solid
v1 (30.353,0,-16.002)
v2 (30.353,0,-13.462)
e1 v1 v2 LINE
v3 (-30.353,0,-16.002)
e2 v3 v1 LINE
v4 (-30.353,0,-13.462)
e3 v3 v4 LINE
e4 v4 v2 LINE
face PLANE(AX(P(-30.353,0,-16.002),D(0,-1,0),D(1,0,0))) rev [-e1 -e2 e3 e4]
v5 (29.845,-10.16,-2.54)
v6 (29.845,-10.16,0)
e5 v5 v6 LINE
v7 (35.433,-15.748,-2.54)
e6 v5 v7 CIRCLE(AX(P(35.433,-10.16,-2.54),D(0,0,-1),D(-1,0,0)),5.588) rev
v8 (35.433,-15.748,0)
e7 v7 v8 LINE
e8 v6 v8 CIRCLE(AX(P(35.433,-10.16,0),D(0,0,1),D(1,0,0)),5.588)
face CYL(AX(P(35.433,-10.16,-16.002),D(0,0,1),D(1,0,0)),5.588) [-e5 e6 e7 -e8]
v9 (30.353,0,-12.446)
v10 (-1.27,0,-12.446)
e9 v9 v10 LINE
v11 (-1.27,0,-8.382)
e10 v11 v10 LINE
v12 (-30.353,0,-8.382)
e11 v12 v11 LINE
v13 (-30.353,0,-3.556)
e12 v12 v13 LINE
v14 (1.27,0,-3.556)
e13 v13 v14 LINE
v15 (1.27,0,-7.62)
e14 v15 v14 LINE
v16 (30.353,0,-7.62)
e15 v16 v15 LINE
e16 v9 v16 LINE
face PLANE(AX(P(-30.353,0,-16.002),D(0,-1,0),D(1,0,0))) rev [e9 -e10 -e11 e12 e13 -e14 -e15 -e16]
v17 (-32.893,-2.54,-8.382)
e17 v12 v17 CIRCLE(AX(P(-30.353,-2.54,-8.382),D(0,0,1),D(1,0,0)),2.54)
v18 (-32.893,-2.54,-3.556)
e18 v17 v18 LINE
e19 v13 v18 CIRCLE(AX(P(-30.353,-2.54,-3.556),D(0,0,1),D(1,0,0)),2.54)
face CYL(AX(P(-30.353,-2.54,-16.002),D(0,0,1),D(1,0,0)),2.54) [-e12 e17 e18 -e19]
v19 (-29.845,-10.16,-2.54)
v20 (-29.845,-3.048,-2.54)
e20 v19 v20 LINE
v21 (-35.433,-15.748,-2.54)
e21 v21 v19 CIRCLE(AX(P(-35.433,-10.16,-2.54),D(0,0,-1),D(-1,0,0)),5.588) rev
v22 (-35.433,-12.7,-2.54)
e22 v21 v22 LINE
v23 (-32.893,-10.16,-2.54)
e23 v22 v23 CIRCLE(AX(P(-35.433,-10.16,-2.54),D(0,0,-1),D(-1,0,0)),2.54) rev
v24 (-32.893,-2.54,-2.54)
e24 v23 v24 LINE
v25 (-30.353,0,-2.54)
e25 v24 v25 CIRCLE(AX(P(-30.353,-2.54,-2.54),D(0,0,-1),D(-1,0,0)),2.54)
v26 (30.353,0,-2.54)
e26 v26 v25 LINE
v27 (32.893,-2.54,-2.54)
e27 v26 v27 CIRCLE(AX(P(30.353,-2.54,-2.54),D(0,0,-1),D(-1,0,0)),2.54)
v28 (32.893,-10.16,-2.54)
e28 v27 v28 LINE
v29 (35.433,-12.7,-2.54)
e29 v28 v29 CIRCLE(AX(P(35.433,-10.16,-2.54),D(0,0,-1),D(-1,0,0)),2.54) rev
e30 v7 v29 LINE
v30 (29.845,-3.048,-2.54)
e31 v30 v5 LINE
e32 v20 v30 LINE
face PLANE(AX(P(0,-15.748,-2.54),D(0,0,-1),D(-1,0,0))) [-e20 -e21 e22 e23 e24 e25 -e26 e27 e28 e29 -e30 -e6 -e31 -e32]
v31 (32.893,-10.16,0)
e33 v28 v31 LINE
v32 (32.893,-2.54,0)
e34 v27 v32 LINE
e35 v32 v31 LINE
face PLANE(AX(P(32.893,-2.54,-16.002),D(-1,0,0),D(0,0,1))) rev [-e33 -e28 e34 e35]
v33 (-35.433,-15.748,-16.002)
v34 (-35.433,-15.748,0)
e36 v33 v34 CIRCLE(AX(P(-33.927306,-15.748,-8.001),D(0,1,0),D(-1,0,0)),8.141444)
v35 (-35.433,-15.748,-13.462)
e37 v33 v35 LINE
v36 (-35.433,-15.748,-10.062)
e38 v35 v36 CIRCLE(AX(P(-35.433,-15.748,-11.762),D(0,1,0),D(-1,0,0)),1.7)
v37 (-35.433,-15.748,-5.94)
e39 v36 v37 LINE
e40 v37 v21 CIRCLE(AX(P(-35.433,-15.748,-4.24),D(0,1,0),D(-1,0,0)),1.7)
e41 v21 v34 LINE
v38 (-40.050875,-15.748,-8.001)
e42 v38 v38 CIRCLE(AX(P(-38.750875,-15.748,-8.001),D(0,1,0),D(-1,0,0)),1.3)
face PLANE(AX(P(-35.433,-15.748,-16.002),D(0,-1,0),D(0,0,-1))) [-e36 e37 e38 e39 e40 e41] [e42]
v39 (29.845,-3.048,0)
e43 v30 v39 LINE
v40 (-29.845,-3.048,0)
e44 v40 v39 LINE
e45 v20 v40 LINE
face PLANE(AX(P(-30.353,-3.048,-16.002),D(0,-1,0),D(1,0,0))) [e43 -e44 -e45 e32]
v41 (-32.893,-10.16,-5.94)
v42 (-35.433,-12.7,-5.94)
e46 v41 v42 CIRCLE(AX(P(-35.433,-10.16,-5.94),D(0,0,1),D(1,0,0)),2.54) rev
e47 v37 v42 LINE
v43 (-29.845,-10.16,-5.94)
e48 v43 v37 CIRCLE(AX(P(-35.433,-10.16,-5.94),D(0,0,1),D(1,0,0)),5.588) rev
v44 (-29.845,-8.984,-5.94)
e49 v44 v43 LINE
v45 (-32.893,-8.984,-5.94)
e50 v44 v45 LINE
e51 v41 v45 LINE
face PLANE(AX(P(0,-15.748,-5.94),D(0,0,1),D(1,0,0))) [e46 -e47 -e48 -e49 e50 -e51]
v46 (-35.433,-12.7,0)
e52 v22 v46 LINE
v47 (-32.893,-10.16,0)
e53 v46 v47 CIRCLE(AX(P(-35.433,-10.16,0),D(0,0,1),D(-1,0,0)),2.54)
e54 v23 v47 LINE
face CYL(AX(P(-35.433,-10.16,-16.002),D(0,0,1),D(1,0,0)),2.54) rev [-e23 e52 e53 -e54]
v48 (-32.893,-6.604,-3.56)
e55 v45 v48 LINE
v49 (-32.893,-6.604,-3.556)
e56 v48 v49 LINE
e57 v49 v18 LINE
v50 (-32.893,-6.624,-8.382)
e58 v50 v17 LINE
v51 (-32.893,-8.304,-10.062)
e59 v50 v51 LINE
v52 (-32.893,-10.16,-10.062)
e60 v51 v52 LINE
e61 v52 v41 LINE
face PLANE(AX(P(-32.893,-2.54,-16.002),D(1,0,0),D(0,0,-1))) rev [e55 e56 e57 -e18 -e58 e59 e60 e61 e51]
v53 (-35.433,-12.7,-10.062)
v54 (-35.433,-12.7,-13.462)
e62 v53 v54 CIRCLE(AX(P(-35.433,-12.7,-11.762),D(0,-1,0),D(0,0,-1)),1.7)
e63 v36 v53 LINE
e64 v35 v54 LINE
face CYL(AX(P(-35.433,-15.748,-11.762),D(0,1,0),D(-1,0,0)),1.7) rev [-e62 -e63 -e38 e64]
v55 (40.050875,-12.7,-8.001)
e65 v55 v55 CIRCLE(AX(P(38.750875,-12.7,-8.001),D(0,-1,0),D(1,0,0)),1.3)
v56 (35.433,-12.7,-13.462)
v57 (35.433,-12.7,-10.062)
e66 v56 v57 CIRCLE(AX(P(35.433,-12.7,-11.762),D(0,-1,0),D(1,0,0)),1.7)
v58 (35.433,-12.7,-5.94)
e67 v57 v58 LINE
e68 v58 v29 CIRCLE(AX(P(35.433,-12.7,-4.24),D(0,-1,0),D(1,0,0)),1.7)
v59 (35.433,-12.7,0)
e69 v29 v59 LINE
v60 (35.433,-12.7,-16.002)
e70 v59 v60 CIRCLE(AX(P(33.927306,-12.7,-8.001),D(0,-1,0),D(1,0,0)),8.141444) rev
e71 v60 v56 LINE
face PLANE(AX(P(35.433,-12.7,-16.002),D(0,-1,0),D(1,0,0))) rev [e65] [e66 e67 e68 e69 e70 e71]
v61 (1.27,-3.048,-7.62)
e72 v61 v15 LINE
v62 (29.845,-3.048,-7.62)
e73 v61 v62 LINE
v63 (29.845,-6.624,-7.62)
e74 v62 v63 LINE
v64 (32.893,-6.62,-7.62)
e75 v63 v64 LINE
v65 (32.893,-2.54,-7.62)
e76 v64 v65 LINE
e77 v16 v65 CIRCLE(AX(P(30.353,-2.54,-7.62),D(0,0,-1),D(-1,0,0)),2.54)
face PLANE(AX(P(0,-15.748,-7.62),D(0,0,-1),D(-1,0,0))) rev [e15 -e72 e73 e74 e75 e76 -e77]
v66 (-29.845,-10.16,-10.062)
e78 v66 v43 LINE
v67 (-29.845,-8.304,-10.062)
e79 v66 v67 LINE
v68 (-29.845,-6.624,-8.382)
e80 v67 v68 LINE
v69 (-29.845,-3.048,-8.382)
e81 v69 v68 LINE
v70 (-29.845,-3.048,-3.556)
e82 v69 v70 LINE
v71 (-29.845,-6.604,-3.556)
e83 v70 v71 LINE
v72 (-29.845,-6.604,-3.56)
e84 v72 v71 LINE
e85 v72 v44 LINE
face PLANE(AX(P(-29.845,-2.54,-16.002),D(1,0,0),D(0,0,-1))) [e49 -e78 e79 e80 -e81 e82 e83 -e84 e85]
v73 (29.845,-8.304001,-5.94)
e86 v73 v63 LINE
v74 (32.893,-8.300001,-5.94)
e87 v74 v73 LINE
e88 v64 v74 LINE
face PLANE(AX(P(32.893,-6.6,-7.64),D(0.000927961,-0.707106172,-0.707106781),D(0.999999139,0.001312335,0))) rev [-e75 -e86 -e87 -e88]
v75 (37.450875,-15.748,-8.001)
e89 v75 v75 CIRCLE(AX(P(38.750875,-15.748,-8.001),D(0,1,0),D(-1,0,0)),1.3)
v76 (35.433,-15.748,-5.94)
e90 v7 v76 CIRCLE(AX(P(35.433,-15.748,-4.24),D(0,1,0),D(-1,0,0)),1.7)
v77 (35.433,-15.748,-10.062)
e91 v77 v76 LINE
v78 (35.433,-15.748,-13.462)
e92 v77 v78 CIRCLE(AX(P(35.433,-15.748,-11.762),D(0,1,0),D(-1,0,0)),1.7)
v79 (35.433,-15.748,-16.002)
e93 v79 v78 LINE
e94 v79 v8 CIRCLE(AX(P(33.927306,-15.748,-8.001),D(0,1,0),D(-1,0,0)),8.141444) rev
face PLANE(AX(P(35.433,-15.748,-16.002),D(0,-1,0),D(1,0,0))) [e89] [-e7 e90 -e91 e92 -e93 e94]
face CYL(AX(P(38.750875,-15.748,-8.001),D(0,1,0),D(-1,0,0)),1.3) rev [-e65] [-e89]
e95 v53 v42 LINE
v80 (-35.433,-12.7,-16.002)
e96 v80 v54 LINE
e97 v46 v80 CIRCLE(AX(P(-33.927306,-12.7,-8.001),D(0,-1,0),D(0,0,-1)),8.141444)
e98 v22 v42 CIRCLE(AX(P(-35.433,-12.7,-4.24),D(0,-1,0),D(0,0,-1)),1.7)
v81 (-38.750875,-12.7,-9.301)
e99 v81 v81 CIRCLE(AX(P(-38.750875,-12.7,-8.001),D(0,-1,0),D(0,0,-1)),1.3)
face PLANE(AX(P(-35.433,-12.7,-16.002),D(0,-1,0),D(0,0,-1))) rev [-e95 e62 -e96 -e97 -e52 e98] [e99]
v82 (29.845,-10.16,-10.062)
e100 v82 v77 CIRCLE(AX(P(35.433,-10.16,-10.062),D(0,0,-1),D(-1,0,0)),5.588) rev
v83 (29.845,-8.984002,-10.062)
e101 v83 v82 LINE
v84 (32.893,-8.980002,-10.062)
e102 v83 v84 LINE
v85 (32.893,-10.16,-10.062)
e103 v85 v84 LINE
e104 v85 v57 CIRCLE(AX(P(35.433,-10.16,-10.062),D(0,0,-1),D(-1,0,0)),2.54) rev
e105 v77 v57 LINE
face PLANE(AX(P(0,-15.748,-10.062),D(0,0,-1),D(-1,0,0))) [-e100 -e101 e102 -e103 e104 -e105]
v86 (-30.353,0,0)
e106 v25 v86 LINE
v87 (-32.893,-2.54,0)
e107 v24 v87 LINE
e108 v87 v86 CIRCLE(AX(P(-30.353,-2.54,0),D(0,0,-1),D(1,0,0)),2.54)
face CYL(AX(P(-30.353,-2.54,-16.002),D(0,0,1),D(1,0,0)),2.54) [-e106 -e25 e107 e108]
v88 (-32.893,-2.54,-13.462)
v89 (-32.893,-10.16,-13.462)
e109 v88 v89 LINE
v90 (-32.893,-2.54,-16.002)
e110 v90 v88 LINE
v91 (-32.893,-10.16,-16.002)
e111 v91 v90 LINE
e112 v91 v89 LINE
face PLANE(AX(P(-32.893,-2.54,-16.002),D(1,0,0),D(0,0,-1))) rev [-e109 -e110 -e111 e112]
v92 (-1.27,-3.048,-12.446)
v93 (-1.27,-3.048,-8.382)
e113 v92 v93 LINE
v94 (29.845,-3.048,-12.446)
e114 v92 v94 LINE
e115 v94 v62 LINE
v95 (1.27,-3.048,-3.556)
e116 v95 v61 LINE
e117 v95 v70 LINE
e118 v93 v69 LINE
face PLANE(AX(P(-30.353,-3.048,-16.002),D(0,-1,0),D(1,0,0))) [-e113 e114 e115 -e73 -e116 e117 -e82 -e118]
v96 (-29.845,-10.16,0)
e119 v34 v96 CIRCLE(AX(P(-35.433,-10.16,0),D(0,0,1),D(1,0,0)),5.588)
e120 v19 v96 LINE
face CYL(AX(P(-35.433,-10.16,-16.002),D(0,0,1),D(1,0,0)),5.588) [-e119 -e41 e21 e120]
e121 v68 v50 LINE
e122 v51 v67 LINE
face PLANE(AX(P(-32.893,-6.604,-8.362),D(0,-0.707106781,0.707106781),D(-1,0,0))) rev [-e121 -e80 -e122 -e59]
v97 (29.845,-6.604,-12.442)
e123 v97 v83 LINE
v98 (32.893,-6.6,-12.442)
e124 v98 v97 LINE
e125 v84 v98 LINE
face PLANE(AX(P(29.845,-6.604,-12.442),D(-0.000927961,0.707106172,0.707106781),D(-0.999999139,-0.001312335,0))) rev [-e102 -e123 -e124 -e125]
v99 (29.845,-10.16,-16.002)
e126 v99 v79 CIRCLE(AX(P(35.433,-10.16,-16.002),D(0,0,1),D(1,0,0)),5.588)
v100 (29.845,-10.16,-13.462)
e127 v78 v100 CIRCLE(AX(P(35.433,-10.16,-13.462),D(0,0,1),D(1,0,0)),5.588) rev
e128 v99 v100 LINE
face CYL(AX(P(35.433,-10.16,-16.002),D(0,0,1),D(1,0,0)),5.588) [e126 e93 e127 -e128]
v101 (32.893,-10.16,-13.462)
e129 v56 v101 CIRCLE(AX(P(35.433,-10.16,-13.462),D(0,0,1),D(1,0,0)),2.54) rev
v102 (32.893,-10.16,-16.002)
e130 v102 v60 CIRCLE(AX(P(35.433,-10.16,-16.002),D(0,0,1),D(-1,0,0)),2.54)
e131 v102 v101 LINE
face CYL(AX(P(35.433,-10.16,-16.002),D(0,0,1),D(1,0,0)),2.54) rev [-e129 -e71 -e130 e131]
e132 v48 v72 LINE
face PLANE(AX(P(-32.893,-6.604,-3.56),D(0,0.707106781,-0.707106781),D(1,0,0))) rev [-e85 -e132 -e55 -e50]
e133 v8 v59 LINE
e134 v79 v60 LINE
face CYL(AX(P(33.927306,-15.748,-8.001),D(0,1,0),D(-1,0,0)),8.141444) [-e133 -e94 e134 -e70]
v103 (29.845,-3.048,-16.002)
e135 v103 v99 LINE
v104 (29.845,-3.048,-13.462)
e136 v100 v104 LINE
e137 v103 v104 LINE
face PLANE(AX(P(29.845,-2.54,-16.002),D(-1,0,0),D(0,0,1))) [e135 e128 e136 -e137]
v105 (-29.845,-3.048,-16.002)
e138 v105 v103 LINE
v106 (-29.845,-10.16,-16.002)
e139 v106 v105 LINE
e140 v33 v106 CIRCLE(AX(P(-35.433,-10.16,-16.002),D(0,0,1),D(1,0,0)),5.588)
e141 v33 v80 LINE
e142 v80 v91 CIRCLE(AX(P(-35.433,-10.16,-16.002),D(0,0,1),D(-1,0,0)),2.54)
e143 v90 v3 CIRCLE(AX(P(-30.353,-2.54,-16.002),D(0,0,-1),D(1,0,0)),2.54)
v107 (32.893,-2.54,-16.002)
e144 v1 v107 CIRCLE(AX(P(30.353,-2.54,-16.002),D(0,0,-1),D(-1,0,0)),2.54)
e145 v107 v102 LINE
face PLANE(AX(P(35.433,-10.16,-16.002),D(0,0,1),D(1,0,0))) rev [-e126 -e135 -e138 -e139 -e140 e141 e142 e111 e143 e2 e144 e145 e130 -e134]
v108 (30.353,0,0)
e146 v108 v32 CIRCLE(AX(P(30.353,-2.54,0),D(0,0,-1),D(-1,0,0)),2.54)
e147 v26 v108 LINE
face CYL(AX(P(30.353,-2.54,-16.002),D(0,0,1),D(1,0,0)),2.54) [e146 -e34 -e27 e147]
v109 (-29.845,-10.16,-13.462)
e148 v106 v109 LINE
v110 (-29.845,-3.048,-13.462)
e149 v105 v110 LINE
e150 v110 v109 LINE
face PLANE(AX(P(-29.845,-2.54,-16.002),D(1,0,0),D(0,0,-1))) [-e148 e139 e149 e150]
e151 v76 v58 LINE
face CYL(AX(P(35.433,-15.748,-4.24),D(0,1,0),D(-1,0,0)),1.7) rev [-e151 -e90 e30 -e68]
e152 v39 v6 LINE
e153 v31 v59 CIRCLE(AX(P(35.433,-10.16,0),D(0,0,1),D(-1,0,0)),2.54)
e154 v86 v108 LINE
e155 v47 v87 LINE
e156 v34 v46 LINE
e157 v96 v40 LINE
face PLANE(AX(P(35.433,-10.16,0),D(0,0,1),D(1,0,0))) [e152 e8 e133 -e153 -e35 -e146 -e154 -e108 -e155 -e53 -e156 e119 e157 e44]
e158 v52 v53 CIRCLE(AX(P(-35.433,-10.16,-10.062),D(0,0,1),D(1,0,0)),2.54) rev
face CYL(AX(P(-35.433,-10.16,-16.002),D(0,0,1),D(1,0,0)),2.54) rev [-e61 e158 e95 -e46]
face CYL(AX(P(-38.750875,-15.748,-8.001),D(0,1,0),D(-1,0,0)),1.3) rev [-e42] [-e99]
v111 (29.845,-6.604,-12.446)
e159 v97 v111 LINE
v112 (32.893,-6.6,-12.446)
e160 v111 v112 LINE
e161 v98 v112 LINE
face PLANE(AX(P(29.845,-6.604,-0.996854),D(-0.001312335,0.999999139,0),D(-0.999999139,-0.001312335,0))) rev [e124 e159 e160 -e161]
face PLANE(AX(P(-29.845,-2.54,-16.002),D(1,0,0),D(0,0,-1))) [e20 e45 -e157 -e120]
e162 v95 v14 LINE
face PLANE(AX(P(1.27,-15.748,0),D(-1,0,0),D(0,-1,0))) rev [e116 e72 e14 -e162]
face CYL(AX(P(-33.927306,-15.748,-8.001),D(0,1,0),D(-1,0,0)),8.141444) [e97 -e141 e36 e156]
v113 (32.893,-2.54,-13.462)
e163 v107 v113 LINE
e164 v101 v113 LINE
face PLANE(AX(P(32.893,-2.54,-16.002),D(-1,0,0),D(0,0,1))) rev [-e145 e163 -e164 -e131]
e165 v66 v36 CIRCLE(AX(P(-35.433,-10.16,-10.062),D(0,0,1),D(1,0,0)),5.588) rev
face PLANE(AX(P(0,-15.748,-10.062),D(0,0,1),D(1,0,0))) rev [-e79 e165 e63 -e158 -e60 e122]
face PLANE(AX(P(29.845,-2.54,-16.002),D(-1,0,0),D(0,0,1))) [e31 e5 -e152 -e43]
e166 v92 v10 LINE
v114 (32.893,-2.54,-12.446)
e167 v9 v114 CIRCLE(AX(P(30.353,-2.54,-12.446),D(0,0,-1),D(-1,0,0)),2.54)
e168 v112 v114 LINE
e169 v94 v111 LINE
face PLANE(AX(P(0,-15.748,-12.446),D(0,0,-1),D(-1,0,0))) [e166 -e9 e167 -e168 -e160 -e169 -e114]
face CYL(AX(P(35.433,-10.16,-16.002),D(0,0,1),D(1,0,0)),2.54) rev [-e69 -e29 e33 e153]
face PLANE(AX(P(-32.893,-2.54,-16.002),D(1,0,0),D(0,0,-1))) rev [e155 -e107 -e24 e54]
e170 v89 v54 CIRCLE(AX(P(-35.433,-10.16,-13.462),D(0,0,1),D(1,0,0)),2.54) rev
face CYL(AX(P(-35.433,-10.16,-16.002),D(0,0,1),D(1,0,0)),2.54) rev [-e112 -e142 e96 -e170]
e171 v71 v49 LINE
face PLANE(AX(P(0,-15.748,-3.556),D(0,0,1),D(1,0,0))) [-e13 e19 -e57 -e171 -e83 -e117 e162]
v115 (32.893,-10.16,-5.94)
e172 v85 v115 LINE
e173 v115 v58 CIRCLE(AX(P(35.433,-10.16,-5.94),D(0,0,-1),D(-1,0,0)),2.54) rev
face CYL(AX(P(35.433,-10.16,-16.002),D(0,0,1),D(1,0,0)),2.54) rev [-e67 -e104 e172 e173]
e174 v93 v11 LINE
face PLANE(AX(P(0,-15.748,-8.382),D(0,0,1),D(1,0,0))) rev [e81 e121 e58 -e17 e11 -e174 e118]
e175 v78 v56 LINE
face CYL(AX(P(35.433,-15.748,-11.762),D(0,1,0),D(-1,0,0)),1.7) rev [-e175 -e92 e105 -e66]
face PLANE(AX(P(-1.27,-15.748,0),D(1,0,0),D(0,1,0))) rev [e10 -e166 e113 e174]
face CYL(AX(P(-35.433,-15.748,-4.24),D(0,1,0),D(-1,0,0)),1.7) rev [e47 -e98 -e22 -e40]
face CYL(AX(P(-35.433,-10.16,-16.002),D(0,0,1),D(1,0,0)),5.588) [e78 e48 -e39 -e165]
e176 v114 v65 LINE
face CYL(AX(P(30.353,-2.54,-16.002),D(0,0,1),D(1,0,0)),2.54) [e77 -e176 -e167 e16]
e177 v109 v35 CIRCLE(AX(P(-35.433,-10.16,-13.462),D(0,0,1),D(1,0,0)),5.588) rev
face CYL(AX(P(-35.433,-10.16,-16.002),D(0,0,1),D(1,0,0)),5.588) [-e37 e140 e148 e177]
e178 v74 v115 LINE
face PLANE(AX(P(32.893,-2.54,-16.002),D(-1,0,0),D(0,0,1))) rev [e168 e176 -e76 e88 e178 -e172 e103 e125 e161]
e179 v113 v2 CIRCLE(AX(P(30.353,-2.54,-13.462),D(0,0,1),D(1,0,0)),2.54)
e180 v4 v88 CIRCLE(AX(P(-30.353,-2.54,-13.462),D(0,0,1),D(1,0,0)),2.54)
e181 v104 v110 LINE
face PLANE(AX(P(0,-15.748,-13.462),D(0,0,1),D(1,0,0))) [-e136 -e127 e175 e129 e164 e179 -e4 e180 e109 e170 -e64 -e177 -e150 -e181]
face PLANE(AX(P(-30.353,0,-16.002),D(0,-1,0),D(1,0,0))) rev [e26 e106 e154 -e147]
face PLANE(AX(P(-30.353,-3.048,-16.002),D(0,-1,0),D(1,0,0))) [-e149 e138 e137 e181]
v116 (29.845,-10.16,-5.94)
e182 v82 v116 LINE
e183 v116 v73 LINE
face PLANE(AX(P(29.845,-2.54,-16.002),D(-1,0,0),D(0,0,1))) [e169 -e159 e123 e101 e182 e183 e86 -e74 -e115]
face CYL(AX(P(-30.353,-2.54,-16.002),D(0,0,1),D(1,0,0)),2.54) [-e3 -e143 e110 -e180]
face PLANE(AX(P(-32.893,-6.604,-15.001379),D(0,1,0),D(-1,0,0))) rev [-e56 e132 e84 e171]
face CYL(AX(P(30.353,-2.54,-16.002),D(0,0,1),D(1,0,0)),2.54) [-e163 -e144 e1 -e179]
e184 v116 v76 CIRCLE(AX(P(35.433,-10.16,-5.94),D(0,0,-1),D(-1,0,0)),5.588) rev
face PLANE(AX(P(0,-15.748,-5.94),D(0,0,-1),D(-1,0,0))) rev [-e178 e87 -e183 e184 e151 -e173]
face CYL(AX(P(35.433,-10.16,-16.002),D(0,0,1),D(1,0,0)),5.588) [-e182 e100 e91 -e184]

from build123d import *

# Parameters (mm, degrees)
EXTRUDE_THIN1_DEPTH    = 16.002
CUT_EXTRUDE1_START     = -15.748
CUT_EXTRUDE1_OUTLINE_R = 1.3
CUT_EXTRUDE1_DEPTH     = 15.748
BOSS_EXTRUDE2_DEPTH    = 1.68
BOSS_EXTRUDE3_START    = 1.68
BOSS_EXTRUDE3_DEPTH    = 1.68
CUT_EXTRUDE2_START     = -2.384
CUT_EXTRUDE2_DEPTH     = 2.384
CUT_EXTRUDE3_DEPTH     = 2.384
CHAMFER1_SIZE          = 1.7
CHAMFER2_SIZE          = 2.38


# Read off the part's stored shape, not the designer's step: Cut-Extrude1
with BuildPart() as part:
    # Sketch1 → Extrude-Thin1 (new body)
    with BuildSketch(Plane.XY):
        with BuildLine():
            Line((-42.06875, -12.7), (-35.433, -12.7))
            ThreePointArc((-35.433, -12.7), (-33.636948776, -11.956051224), (-32.893, -10.16))
            Line((-32.893, -10.16), (-32.893, -2.54))
            ThreePointArc((-32.893, -2.54), (-32.149051224, -0.743948776), (-30.353, 0))
            Line((-30.353, 0), (30.353, 0))
            ThreePointArc((30.353, 0), (32.149051224, -0.743948776), (32.893, -2.54))
            Line((32.893, -2.54), (32.893, -10.16))
            ThreePointArc((32.893, -10.16), (33.636948776, -11.956051224), (35.433, -12.7))
            Line((35.433, -12.7), (42.06875, -12.7))
            Line((42.06875, -12.7), (42.06875, -15.748))
            Line((42.06875, -15.748), (35.433, -15.748))
            ThreePointArc((35.433, -15.748), (31.481687307, -14.111312693), (29.845, -10.16))
            Line((29.845, -10.16), (29.845, -3.048))
            Line((29.845, -3.048), (-29.845, -3.048))
            Line((-29.845, -3.048), (-29.845, -10.16))
            ThreePointArc((-29.845, -10.16), (-31.481687307, -14.111312693), (-35.433, -15.748))
            Line((-35.433, -15.748), (-42.06875, -15.748))
            Line((-42.06875, -15.748), (-42.06875, -12.7))
        make_face()
    extrude(amount=-EXTRUDE_THIN1_DEPTH)

    # Cut-Extrude1 outline → Cut-Extrude1 (cut)
    with BuildSketch(Plane(origin=(0, 0, 0), x_dir=(1, 0, 0), z_dir=(0, 1, 0)).offset(CUT_EXTRUDE1_START)):
        with BuildLine():
            Line((35.433, 13.462), (-35.433, 13.462))
            ThreePointArc((-35.433, 13.462), (-37.133, 11.762), (-35.433, 10.062))
            Line((-35.433, 10.062), (-32.893, 10.062))
            Line((-32.893, 10.062), (-32.893, 8.382))
            Line((-32.893, 8.382), (-1.27, 8.382))
            Line((-1.27, 8.382), (-1.27, 12.446))
            Line((-1.27, 12.446), (32.893, 12.446))
            Line((32.893, 12.446), (32.893, 10.062))
            Line((32.893, 10.062), (35.433, 10.062))
            ThreePointArc((35.433, 10.062), (37.133, 11.762), (35.433, 13.462))
        make_face()
        with BuildLine():
            Line((32.893, 5.94), (32.893, 7.62))
            Line((32.893, 7.62), (1.27, 7.62))
            Line((1.27, 7.62), (1.27, 3.556))
            Line((1.27, 3.556), (-32.893, 3.556))
            Line((-32.893, 3.556), (-32.893, 5.94))
            Line((-32.893, 5.94), (-35.433, 5.94))
            ThreePointArc((-35.433, 5.94), (-37.133, 4.24), (-35.433, 2.54))
            Line((-35.433, 2.54), (35.433, 2.54))
            ThreePointArc((35.433, 2.54), (37.133, 4.24), (35.433, 5.94))
            Line((35.433, 5.94), (32.893, 5.94))
        make_face()
        with BuildLine():
            Line((42.06875, 16.002), (35.433, 16.002))
            ThreePointArc((35.433, 16.002), (40.193949205, 13.198335352), (42.06875, 8.001))
            Line((42.06875, 8.001), (42.06875, 16.002))
        make_face()
        with BuildLine():
            Line((42.06875, 0), (42.06875, 8.001))
            ThreePointArc((42.06875, 8.001), (40.193949205, 2.803664648), (35.433, 0))
            Line((35.433, 0), (42.06875, 0))
        make_face()
        with BuildLine():
            ThreePointArc((-42.06875, 8.001), (-40.193949205, 13.198335352), (-35.433, 16.002))
            Line((-35.433, 16.002), (-42.06875, 16.002))
            Line((-42.06875, 16.002), (-42.06875, 8.001))
        make_face()
        with BuildLine():
            ThreePointArc((-35.433, 0), (-40.193949205, 2.803664648), (-42.06875, 8.001))
            Line((-42.06875, 8.001), (-42.06875, 0))
            Line((-42.06875, 0), (-35.433, 0))
        make_face()
        with Locations((38.750875, 8.001)):
            Circle(CUT_EXTRUDE1_OUTLINE_R)
        with Locations((-38.750875, 8.001)):
            Circle(CUT_EXTRUDE1_OUTLINE_R)
    extrude(amount=CUT_EXTRUDE1_DEPTH, mode=Mode.SUBTRACT)

    # Sketch6 → Boss-Extrude2 (add)
    with BuildSketch(Plane(origin=(0, 0, -8.382), x_dir=(-1, 0, 0), z_dir=(0, 0, -1))):
        with BuildLine():
            Line((32.893, -10.16), (32.893, -6.604))
            Line((32.893, -6.604), (29.845, -6.604))
            Line((29.845, -6.604), (29.845, -10.16))
            ThreePointArc((29.845, -10.16), (30.667537588, -13.078237824), (32.893, -15.137363157))
            Line((32.893, -15.137363157), (32.893, -10.16))
        make_face()
    extrude(amount=BOSS_EXTRUDE2_DEPTH)

    # Sketch7 → Boss-Extrude3 (add)
    with BuildSketch(Plane.XY.offset(-7.62).offset(BOSS_EXTRUDE3_START)):
        with BuildLine():
            Line((32.893, -10.16), (32.893, -6.6))
            Line((32.893, -6.6), (29.845, -6.604))
            Line((29.845, -6.604), (29.845, -10.16))
            ThreePointArc((29.845, -10.16), (30.667537588, -13.078237824), (32.893, -15.137363157))
            Line((32.893, -15.137363157), (32.893, -10.16))
        make_face()
    extrude(amount=-BOSS_EXTRUDE3_DEPTH)

    # Sketch8 → Cut-Extrude2 (cut)
    with BuildSketch(Plane(origin=(0, 0, -12.446), x_dir=(-1, 0, 0), z_dir=(0, 0, -1)).offset(CUT_EXTRUDE2_START)):
        with BuildLine():
            Line((-32.893, -15.137363157), (-32.893, -6.6))
            Line((-32.893, -6.6), (-29.845, -6.604))
            Line((-29.845, -6.604), (-29.845, -10.16))
            ThreePointArc((-29.845, -10.16), (-30.667537588, -13.078237824), (-32.893, -15.137363157))
        make_face()
    extrude(amount=CUT_EXTRUDE2_DEPTH, mode=Mode.SUBTRACT)

    # Sketch9 → Cut-Extrude3 (cut)
    with BuildSketch(Plane.XY.offset(-3.556)):
        with BuildLine():
            Line((-32.893, -15.137363157), (-32.893, -6.604))
            Line((-32.893, -6.604), (-29.845, -6.604))
            Line((-29.845, -6.604), (-29.845, -10.16))
            ThreePointArc((-29.845, -10.16), (-30.667537588, -13.078237824), (-32.893, -15.137363157))
        make_face()
    extrude(amount=-CUT_EXTRUDE3_DEPTH, mode=Mode.SUBTRACT)

    # Chamfer1
    # the kernel refuses this chamfer: 1.7 mm, written as the material it adds along each edge
    # the kernel refuses this chamfer: 1.7 mm, written as the material it takes off along each edge
    with BuildSketch(Plane(origin=(-37.26486108, -6.604, -10.062), x_dir=(0, -0.9996219169112968, -0.02749587661058687), z_dir=(1, 0, 0))) as chamfer1_2_piece_1_section:
        Polygon((CHAMFER1_SIZE * 0.999621916911, -CHAMFER1_SIZE * 0.0274958766106), (-CHAMFER1_SIZE * 0.0274958766106, -CHAMFER1_SIZE * 0.999621916911), (0, 0), align=None)
    chamfer1_2_piece_1 = extrude(amount=11.791722159, mode=Mode.PRIVATE)
    chamfer1_2_piece_1 = split(chamfer1_2_piece_1, bisect_by=Plane(origin=(-31.369, -7.170744186, -8.382), z_dir=(0, 0, -1)), keep=Keep.TOP, mode=Mode.PRIVATE)
    add(chamfer1_2_piece_1, mode=Mode.SUBTRACT)
    with BuildSketch(Plane(origin=(37.264857315, -6.594262654, -5.94), x_dir=(0.00131183865632537, -0.9996210561251475, 0.02749587661058631), z_dir=(-0.999999138888279, -0.0013123348279305267, 0))) as chamfer1_2_piece_2_section:
        Polygon((CHAMFER1_SIZE * 0.999621916911, -CHAMFER1_SIZE * 0.0274958766106), (-CHAMFER1_SIZE * 0.0274958766106, -CHAMFER1_SIZE * 0.999621916911), (0, 0), align=None)
    chamfer1_2_piece_2 = extrude(amount=11.791724784, mode=Mode.PRIVATE)
    chamfer1_2_piece_2 = split(chamfer1_2_piece_2, bisect_by=Plane(origin=(31.369, -7.168744674, -7.62), z_dir=(0, 0, 1)), keep=Keep.TOP, mode=Mode.PRIVATE)
    add(chamfer1_2_piece_2, mode=Mode.SUBTRACT)

    # Chamfer2
    chamfer2_edges = [part.edges().sort_by_distance(p)[0] for p in [
        (31.369, -6.602, -10.062),
        (-31.369, -6.604, -5.94),
    ]]
    chamfer(chamfer2_edges, length=CHAMFER2_SIZE)


solid = part.part
